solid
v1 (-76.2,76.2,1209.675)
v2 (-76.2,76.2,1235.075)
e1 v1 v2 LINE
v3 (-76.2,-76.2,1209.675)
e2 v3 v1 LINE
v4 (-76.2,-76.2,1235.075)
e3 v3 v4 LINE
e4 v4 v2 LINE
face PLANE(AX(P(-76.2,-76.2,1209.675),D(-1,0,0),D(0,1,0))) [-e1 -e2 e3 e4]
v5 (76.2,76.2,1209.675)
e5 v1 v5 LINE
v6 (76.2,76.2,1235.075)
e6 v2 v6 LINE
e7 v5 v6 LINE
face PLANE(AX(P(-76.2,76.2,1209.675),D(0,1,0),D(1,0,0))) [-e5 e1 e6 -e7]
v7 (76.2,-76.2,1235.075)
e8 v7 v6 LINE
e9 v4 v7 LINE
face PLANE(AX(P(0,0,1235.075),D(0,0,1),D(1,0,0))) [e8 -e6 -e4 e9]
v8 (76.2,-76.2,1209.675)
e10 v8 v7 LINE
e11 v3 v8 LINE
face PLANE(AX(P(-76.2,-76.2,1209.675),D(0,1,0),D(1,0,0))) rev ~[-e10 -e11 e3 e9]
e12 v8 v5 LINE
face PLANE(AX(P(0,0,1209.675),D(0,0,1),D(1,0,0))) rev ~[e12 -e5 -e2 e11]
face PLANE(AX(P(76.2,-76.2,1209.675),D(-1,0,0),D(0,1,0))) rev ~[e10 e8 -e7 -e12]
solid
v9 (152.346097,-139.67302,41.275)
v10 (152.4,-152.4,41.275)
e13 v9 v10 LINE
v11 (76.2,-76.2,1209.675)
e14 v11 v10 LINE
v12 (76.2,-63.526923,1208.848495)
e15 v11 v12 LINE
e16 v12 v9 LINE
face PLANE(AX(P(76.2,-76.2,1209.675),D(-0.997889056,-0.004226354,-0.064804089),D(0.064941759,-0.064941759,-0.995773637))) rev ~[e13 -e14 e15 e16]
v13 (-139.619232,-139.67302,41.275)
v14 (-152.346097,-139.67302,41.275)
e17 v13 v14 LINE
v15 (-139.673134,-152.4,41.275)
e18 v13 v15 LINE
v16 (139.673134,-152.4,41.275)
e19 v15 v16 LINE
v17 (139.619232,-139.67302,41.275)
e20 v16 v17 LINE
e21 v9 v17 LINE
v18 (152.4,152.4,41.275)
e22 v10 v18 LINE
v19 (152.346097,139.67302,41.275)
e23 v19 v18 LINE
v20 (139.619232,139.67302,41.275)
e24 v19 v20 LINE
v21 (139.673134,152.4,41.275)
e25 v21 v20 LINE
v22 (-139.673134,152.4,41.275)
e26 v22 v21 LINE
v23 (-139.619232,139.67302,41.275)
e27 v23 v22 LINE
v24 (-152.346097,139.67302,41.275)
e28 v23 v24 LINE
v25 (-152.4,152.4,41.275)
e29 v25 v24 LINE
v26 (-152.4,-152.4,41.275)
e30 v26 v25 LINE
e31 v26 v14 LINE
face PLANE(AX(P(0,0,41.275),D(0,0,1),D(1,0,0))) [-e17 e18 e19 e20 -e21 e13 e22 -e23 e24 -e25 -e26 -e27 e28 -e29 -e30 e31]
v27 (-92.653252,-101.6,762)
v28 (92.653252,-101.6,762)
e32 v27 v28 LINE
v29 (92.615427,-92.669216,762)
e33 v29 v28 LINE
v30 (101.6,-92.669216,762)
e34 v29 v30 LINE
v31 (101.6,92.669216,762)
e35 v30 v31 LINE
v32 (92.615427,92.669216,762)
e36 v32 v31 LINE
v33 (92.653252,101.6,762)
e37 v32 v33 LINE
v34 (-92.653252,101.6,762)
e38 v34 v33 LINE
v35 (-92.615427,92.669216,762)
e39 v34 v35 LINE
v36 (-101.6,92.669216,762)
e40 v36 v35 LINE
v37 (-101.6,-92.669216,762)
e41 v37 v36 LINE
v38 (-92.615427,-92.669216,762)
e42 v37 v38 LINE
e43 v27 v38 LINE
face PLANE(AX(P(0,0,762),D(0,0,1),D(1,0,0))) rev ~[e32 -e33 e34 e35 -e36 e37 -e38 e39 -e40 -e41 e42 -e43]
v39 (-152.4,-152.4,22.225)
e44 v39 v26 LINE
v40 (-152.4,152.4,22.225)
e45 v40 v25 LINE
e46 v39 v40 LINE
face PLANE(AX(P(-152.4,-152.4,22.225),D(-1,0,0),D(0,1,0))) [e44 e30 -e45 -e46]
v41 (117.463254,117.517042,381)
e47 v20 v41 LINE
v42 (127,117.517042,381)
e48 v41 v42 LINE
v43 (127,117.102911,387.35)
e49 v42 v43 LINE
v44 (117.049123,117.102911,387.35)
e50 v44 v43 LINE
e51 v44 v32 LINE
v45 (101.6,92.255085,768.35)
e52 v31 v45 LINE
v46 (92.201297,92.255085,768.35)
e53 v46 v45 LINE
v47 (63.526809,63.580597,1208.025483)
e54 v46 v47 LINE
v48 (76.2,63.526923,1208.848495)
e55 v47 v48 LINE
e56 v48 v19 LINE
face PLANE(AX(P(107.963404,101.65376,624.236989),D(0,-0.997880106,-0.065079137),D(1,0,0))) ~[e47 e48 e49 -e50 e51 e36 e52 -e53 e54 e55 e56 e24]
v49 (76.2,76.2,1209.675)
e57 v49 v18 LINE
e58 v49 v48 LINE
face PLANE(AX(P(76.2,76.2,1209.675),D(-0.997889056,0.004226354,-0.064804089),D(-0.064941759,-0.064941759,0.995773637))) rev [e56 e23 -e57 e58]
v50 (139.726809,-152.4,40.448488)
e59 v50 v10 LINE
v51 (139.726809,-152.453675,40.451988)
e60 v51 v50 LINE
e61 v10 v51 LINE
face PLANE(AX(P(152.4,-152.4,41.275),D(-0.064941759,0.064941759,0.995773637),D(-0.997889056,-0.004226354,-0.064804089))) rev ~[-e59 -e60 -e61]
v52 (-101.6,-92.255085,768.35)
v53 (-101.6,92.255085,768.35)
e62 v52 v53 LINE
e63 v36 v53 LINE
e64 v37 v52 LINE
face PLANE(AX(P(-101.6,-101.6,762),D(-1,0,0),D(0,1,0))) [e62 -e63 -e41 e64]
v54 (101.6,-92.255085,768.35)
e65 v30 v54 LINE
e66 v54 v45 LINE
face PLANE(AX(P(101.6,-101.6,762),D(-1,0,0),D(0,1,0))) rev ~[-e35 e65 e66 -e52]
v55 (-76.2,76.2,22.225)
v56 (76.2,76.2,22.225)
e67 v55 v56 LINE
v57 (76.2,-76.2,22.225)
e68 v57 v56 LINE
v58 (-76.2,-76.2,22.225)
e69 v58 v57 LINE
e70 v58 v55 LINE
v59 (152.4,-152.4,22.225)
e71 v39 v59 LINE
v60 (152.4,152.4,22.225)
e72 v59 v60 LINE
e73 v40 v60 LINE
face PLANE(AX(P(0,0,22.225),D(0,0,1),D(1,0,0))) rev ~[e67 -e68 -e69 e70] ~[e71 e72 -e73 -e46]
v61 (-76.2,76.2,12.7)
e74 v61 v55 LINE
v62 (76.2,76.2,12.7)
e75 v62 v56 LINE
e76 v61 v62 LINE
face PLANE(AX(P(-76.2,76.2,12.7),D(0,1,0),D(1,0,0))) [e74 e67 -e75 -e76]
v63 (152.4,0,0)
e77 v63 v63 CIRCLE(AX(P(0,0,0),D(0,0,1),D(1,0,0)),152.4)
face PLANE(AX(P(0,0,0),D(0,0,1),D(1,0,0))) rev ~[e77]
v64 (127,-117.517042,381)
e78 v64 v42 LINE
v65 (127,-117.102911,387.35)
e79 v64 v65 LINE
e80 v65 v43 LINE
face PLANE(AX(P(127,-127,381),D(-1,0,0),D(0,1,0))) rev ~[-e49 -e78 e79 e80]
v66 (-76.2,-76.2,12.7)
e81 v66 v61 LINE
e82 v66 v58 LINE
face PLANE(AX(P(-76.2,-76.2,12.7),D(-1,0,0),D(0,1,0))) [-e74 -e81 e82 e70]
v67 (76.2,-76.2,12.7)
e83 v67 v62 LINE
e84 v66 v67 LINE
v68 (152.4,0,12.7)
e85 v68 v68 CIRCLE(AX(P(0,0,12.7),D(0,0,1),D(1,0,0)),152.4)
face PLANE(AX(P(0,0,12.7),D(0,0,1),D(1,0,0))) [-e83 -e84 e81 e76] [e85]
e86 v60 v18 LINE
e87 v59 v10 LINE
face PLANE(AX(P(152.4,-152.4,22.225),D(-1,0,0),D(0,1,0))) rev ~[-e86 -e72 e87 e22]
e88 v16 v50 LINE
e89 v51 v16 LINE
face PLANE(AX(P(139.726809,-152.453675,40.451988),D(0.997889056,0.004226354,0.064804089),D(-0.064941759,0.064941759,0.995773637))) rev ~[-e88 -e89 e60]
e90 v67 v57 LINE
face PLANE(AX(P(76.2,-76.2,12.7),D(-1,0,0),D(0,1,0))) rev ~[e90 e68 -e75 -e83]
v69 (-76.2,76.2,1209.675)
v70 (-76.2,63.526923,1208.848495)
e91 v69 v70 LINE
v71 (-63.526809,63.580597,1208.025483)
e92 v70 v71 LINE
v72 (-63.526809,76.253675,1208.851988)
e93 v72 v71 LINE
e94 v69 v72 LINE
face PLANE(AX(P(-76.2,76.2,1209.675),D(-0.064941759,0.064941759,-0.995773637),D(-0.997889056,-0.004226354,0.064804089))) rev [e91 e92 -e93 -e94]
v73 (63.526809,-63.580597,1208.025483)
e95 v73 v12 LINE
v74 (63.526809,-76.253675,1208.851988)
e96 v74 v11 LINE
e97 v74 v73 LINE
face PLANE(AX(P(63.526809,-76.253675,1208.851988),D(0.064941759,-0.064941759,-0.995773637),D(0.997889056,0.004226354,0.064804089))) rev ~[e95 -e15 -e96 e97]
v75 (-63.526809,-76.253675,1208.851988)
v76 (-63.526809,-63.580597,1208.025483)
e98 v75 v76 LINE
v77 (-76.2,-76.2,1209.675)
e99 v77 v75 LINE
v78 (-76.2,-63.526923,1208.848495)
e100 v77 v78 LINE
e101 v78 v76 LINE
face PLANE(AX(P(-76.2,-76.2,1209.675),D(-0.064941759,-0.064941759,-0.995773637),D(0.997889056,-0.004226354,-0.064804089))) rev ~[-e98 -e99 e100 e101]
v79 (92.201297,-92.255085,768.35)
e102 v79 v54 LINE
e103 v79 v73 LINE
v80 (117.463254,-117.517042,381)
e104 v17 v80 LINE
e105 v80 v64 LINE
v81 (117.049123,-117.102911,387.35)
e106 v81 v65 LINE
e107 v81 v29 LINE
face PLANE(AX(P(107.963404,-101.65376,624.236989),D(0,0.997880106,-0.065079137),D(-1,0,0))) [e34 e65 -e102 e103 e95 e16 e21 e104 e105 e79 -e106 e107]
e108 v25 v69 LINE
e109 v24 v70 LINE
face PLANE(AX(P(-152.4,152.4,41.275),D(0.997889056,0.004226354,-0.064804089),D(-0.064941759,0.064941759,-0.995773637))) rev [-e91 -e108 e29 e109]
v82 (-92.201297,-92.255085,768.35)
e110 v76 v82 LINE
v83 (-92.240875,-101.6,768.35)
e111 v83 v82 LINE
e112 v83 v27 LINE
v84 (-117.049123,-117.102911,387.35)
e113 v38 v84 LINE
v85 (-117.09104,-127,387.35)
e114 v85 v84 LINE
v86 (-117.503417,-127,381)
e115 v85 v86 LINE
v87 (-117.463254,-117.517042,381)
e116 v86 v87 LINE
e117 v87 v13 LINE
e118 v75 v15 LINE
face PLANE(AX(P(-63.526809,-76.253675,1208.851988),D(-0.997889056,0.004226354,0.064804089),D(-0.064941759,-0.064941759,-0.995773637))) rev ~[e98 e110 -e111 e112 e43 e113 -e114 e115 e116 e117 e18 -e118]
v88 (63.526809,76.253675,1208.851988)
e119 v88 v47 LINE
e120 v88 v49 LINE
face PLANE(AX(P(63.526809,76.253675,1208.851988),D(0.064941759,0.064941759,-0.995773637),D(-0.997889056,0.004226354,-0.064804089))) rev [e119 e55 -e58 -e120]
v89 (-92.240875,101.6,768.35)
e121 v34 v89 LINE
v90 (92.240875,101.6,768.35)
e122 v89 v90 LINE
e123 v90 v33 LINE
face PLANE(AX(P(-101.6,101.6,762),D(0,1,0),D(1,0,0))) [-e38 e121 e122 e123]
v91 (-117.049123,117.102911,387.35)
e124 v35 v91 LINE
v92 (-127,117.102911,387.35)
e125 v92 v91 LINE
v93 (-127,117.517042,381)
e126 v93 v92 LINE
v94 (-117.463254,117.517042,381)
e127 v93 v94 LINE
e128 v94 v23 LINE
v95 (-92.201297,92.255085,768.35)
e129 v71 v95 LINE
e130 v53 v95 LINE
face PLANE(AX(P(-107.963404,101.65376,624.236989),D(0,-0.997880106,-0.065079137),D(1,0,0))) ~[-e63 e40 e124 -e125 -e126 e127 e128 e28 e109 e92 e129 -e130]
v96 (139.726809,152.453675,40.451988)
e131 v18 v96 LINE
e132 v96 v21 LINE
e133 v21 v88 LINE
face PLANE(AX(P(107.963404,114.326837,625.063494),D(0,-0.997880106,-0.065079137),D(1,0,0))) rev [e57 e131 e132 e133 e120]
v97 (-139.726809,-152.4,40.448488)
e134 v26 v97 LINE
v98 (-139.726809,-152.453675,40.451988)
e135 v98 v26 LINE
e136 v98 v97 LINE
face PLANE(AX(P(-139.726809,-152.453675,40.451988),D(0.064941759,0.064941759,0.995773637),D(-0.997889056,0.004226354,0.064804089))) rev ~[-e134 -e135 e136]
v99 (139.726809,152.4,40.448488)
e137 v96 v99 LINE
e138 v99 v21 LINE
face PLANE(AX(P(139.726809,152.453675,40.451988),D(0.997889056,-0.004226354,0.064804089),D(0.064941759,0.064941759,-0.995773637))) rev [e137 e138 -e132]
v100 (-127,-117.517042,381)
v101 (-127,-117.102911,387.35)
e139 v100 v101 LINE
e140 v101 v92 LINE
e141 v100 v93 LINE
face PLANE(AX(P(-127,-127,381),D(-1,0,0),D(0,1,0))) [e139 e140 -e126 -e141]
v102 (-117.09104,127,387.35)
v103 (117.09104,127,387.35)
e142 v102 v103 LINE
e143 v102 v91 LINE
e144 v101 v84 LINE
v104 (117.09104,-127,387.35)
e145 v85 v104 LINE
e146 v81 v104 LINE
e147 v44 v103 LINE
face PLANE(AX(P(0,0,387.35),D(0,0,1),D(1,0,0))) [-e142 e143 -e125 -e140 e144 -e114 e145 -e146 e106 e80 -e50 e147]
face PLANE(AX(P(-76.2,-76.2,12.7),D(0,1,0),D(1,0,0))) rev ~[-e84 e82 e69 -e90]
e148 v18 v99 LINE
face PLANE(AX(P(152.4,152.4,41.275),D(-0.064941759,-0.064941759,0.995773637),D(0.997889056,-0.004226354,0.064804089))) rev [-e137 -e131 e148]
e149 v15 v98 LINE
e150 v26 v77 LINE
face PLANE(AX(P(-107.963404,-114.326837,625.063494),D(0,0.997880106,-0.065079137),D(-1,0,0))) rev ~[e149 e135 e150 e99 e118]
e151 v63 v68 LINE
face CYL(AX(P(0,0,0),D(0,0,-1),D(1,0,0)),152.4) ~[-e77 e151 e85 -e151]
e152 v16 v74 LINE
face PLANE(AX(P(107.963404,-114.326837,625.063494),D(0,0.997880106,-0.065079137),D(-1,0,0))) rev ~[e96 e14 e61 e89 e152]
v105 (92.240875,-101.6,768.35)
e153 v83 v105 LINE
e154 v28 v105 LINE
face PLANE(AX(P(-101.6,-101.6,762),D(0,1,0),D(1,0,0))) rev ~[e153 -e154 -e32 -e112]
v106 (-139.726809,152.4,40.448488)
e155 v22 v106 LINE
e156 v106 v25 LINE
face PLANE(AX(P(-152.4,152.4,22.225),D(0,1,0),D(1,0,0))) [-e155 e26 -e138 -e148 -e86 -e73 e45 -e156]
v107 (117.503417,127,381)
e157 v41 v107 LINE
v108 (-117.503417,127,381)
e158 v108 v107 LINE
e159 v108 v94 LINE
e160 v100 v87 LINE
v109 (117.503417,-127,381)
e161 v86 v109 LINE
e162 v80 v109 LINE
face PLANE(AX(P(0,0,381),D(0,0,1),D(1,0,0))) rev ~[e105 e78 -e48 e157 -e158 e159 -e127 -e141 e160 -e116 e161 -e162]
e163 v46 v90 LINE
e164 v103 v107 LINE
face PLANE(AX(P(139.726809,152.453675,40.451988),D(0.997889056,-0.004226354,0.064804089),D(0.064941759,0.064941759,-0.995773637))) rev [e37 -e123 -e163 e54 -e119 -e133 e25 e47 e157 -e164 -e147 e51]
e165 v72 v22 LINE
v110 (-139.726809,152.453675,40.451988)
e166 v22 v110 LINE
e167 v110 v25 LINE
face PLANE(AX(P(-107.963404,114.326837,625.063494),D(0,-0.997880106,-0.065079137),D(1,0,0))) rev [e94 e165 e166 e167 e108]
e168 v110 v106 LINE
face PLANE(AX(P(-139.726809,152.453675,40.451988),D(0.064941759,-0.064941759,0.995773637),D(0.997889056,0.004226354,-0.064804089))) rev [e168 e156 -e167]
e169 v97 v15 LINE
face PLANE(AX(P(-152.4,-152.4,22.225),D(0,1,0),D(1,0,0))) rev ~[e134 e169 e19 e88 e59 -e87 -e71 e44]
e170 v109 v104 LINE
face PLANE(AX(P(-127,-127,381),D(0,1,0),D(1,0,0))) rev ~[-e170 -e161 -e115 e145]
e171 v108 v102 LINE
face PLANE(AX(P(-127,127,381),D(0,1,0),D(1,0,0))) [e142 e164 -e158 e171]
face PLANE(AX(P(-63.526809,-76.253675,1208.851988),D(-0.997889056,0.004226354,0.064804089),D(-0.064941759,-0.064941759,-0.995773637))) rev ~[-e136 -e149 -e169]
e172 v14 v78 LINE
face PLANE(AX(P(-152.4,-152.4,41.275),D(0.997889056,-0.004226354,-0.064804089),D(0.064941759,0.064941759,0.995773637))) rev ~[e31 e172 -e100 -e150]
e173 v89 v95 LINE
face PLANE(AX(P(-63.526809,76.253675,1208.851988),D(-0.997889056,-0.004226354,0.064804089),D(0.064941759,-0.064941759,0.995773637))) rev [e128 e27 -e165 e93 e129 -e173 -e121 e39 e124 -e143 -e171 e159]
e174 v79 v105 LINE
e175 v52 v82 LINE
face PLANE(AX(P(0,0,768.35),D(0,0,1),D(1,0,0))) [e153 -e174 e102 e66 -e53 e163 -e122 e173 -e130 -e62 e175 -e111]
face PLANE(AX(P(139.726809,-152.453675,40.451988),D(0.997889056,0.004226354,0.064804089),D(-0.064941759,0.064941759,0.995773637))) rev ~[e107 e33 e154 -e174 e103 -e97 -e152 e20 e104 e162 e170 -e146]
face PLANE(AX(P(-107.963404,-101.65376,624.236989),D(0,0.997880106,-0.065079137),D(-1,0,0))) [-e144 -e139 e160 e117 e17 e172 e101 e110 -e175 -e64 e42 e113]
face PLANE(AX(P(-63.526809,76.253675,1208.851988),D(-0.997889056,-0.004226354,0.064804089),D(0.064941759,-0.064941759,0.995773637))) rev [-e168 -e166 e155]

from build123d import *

# Parameters (mm, degrees)
F0_R      = 152.4
F1_DEPTH  = 12.7
F2_W      = 152.4
F2_H      = 152.4
F3_DEPTH  = 9.525
F4_W      = 304.8
F4_H      = 304.8
F5_DEPTH  = 19.05
F7_W      = 152.4
F7_H      = 152.4
F8_DEPTH  = 25.4
F11_DEPTH = 12.7
F13_W     = 254
F13_H     = 254
F14_DEPTH = 6.35
F16_W     = 203.2
F16_H     = 203.2
F17_DEPTH = 6.35


# Not quite as in the source:
# - a pattern or mirror of a feature is missing from the dataset's text; its kind, count and spacing are read off the source's solid


with BuildPart() as f1:
    # F0 (on Top) → F1 (new body)
    with BuildSketch(Plane.XY):
        Circle(F0_R)
    extrude(amount=F1_DEPTH)

    # F2 (on face) → F3 (join)
    with BuildSketch(Plane.XY.offset(12.7)):
        Rectangle(F2_W, F2_H)
    extrude(amount=F3_DEPTH)

    # F4 (on face) → F5 (join)
    with BuildSketch(Plane.XY.offset(22.225)):
        Rectangle(F4_W, F4_H)
    extrude(amount=F5_DEPTH)

    # F10 (on 3pt) → F11 (join)
    with BuildSketch(Plane(origin=(0, -154.4349882353, 10.0718470588), x_dir=(-1, 0, 0), z_dir=(0, 0.997880106, -0.0650791373))):
        Polygon((152.4, 31.2694408423), (76.2, 1202.1515869185), (63.5268089897, 1201.3268265801), (139.7268089897, 30.4446805039), align=None)
        Polygon((-63.5268089897, 1201.3268265801), (-76.2, 1202.1515869185), (-152.4, 31.2694408423), (-139.7268089897, 30.4446805039), align=None)
    f11 = extrude(amount=F11_DEPTH)

    # F11_copies: F11 across plane
    add(f11.mirror(Plane.ZX))

    # F13 (on offset) → F14 (join)
    with BuildSketch(Plane.XY.offset(381)):
        Rectangle(F13_W, F13_H)
    extrude(amount=F14_DEPTH)

    # F16 (on offset) → F17 (join)
    with BuildSketch(Plane.XY.offset(762)):
        Rectangle(F16_W, F16_H)
    extrude(amount=F17_DEPTH)


with BuildPart() as f8:
    # F7 (on offset) → F8 (new body)
    with BuildSketch(Plane.XY.offset(1209.675)):
        Rectangle(F7_W, F7_H)
    extrude(amount=F8_DEPTH)


solid = Compound([f1.part, f8.part])
